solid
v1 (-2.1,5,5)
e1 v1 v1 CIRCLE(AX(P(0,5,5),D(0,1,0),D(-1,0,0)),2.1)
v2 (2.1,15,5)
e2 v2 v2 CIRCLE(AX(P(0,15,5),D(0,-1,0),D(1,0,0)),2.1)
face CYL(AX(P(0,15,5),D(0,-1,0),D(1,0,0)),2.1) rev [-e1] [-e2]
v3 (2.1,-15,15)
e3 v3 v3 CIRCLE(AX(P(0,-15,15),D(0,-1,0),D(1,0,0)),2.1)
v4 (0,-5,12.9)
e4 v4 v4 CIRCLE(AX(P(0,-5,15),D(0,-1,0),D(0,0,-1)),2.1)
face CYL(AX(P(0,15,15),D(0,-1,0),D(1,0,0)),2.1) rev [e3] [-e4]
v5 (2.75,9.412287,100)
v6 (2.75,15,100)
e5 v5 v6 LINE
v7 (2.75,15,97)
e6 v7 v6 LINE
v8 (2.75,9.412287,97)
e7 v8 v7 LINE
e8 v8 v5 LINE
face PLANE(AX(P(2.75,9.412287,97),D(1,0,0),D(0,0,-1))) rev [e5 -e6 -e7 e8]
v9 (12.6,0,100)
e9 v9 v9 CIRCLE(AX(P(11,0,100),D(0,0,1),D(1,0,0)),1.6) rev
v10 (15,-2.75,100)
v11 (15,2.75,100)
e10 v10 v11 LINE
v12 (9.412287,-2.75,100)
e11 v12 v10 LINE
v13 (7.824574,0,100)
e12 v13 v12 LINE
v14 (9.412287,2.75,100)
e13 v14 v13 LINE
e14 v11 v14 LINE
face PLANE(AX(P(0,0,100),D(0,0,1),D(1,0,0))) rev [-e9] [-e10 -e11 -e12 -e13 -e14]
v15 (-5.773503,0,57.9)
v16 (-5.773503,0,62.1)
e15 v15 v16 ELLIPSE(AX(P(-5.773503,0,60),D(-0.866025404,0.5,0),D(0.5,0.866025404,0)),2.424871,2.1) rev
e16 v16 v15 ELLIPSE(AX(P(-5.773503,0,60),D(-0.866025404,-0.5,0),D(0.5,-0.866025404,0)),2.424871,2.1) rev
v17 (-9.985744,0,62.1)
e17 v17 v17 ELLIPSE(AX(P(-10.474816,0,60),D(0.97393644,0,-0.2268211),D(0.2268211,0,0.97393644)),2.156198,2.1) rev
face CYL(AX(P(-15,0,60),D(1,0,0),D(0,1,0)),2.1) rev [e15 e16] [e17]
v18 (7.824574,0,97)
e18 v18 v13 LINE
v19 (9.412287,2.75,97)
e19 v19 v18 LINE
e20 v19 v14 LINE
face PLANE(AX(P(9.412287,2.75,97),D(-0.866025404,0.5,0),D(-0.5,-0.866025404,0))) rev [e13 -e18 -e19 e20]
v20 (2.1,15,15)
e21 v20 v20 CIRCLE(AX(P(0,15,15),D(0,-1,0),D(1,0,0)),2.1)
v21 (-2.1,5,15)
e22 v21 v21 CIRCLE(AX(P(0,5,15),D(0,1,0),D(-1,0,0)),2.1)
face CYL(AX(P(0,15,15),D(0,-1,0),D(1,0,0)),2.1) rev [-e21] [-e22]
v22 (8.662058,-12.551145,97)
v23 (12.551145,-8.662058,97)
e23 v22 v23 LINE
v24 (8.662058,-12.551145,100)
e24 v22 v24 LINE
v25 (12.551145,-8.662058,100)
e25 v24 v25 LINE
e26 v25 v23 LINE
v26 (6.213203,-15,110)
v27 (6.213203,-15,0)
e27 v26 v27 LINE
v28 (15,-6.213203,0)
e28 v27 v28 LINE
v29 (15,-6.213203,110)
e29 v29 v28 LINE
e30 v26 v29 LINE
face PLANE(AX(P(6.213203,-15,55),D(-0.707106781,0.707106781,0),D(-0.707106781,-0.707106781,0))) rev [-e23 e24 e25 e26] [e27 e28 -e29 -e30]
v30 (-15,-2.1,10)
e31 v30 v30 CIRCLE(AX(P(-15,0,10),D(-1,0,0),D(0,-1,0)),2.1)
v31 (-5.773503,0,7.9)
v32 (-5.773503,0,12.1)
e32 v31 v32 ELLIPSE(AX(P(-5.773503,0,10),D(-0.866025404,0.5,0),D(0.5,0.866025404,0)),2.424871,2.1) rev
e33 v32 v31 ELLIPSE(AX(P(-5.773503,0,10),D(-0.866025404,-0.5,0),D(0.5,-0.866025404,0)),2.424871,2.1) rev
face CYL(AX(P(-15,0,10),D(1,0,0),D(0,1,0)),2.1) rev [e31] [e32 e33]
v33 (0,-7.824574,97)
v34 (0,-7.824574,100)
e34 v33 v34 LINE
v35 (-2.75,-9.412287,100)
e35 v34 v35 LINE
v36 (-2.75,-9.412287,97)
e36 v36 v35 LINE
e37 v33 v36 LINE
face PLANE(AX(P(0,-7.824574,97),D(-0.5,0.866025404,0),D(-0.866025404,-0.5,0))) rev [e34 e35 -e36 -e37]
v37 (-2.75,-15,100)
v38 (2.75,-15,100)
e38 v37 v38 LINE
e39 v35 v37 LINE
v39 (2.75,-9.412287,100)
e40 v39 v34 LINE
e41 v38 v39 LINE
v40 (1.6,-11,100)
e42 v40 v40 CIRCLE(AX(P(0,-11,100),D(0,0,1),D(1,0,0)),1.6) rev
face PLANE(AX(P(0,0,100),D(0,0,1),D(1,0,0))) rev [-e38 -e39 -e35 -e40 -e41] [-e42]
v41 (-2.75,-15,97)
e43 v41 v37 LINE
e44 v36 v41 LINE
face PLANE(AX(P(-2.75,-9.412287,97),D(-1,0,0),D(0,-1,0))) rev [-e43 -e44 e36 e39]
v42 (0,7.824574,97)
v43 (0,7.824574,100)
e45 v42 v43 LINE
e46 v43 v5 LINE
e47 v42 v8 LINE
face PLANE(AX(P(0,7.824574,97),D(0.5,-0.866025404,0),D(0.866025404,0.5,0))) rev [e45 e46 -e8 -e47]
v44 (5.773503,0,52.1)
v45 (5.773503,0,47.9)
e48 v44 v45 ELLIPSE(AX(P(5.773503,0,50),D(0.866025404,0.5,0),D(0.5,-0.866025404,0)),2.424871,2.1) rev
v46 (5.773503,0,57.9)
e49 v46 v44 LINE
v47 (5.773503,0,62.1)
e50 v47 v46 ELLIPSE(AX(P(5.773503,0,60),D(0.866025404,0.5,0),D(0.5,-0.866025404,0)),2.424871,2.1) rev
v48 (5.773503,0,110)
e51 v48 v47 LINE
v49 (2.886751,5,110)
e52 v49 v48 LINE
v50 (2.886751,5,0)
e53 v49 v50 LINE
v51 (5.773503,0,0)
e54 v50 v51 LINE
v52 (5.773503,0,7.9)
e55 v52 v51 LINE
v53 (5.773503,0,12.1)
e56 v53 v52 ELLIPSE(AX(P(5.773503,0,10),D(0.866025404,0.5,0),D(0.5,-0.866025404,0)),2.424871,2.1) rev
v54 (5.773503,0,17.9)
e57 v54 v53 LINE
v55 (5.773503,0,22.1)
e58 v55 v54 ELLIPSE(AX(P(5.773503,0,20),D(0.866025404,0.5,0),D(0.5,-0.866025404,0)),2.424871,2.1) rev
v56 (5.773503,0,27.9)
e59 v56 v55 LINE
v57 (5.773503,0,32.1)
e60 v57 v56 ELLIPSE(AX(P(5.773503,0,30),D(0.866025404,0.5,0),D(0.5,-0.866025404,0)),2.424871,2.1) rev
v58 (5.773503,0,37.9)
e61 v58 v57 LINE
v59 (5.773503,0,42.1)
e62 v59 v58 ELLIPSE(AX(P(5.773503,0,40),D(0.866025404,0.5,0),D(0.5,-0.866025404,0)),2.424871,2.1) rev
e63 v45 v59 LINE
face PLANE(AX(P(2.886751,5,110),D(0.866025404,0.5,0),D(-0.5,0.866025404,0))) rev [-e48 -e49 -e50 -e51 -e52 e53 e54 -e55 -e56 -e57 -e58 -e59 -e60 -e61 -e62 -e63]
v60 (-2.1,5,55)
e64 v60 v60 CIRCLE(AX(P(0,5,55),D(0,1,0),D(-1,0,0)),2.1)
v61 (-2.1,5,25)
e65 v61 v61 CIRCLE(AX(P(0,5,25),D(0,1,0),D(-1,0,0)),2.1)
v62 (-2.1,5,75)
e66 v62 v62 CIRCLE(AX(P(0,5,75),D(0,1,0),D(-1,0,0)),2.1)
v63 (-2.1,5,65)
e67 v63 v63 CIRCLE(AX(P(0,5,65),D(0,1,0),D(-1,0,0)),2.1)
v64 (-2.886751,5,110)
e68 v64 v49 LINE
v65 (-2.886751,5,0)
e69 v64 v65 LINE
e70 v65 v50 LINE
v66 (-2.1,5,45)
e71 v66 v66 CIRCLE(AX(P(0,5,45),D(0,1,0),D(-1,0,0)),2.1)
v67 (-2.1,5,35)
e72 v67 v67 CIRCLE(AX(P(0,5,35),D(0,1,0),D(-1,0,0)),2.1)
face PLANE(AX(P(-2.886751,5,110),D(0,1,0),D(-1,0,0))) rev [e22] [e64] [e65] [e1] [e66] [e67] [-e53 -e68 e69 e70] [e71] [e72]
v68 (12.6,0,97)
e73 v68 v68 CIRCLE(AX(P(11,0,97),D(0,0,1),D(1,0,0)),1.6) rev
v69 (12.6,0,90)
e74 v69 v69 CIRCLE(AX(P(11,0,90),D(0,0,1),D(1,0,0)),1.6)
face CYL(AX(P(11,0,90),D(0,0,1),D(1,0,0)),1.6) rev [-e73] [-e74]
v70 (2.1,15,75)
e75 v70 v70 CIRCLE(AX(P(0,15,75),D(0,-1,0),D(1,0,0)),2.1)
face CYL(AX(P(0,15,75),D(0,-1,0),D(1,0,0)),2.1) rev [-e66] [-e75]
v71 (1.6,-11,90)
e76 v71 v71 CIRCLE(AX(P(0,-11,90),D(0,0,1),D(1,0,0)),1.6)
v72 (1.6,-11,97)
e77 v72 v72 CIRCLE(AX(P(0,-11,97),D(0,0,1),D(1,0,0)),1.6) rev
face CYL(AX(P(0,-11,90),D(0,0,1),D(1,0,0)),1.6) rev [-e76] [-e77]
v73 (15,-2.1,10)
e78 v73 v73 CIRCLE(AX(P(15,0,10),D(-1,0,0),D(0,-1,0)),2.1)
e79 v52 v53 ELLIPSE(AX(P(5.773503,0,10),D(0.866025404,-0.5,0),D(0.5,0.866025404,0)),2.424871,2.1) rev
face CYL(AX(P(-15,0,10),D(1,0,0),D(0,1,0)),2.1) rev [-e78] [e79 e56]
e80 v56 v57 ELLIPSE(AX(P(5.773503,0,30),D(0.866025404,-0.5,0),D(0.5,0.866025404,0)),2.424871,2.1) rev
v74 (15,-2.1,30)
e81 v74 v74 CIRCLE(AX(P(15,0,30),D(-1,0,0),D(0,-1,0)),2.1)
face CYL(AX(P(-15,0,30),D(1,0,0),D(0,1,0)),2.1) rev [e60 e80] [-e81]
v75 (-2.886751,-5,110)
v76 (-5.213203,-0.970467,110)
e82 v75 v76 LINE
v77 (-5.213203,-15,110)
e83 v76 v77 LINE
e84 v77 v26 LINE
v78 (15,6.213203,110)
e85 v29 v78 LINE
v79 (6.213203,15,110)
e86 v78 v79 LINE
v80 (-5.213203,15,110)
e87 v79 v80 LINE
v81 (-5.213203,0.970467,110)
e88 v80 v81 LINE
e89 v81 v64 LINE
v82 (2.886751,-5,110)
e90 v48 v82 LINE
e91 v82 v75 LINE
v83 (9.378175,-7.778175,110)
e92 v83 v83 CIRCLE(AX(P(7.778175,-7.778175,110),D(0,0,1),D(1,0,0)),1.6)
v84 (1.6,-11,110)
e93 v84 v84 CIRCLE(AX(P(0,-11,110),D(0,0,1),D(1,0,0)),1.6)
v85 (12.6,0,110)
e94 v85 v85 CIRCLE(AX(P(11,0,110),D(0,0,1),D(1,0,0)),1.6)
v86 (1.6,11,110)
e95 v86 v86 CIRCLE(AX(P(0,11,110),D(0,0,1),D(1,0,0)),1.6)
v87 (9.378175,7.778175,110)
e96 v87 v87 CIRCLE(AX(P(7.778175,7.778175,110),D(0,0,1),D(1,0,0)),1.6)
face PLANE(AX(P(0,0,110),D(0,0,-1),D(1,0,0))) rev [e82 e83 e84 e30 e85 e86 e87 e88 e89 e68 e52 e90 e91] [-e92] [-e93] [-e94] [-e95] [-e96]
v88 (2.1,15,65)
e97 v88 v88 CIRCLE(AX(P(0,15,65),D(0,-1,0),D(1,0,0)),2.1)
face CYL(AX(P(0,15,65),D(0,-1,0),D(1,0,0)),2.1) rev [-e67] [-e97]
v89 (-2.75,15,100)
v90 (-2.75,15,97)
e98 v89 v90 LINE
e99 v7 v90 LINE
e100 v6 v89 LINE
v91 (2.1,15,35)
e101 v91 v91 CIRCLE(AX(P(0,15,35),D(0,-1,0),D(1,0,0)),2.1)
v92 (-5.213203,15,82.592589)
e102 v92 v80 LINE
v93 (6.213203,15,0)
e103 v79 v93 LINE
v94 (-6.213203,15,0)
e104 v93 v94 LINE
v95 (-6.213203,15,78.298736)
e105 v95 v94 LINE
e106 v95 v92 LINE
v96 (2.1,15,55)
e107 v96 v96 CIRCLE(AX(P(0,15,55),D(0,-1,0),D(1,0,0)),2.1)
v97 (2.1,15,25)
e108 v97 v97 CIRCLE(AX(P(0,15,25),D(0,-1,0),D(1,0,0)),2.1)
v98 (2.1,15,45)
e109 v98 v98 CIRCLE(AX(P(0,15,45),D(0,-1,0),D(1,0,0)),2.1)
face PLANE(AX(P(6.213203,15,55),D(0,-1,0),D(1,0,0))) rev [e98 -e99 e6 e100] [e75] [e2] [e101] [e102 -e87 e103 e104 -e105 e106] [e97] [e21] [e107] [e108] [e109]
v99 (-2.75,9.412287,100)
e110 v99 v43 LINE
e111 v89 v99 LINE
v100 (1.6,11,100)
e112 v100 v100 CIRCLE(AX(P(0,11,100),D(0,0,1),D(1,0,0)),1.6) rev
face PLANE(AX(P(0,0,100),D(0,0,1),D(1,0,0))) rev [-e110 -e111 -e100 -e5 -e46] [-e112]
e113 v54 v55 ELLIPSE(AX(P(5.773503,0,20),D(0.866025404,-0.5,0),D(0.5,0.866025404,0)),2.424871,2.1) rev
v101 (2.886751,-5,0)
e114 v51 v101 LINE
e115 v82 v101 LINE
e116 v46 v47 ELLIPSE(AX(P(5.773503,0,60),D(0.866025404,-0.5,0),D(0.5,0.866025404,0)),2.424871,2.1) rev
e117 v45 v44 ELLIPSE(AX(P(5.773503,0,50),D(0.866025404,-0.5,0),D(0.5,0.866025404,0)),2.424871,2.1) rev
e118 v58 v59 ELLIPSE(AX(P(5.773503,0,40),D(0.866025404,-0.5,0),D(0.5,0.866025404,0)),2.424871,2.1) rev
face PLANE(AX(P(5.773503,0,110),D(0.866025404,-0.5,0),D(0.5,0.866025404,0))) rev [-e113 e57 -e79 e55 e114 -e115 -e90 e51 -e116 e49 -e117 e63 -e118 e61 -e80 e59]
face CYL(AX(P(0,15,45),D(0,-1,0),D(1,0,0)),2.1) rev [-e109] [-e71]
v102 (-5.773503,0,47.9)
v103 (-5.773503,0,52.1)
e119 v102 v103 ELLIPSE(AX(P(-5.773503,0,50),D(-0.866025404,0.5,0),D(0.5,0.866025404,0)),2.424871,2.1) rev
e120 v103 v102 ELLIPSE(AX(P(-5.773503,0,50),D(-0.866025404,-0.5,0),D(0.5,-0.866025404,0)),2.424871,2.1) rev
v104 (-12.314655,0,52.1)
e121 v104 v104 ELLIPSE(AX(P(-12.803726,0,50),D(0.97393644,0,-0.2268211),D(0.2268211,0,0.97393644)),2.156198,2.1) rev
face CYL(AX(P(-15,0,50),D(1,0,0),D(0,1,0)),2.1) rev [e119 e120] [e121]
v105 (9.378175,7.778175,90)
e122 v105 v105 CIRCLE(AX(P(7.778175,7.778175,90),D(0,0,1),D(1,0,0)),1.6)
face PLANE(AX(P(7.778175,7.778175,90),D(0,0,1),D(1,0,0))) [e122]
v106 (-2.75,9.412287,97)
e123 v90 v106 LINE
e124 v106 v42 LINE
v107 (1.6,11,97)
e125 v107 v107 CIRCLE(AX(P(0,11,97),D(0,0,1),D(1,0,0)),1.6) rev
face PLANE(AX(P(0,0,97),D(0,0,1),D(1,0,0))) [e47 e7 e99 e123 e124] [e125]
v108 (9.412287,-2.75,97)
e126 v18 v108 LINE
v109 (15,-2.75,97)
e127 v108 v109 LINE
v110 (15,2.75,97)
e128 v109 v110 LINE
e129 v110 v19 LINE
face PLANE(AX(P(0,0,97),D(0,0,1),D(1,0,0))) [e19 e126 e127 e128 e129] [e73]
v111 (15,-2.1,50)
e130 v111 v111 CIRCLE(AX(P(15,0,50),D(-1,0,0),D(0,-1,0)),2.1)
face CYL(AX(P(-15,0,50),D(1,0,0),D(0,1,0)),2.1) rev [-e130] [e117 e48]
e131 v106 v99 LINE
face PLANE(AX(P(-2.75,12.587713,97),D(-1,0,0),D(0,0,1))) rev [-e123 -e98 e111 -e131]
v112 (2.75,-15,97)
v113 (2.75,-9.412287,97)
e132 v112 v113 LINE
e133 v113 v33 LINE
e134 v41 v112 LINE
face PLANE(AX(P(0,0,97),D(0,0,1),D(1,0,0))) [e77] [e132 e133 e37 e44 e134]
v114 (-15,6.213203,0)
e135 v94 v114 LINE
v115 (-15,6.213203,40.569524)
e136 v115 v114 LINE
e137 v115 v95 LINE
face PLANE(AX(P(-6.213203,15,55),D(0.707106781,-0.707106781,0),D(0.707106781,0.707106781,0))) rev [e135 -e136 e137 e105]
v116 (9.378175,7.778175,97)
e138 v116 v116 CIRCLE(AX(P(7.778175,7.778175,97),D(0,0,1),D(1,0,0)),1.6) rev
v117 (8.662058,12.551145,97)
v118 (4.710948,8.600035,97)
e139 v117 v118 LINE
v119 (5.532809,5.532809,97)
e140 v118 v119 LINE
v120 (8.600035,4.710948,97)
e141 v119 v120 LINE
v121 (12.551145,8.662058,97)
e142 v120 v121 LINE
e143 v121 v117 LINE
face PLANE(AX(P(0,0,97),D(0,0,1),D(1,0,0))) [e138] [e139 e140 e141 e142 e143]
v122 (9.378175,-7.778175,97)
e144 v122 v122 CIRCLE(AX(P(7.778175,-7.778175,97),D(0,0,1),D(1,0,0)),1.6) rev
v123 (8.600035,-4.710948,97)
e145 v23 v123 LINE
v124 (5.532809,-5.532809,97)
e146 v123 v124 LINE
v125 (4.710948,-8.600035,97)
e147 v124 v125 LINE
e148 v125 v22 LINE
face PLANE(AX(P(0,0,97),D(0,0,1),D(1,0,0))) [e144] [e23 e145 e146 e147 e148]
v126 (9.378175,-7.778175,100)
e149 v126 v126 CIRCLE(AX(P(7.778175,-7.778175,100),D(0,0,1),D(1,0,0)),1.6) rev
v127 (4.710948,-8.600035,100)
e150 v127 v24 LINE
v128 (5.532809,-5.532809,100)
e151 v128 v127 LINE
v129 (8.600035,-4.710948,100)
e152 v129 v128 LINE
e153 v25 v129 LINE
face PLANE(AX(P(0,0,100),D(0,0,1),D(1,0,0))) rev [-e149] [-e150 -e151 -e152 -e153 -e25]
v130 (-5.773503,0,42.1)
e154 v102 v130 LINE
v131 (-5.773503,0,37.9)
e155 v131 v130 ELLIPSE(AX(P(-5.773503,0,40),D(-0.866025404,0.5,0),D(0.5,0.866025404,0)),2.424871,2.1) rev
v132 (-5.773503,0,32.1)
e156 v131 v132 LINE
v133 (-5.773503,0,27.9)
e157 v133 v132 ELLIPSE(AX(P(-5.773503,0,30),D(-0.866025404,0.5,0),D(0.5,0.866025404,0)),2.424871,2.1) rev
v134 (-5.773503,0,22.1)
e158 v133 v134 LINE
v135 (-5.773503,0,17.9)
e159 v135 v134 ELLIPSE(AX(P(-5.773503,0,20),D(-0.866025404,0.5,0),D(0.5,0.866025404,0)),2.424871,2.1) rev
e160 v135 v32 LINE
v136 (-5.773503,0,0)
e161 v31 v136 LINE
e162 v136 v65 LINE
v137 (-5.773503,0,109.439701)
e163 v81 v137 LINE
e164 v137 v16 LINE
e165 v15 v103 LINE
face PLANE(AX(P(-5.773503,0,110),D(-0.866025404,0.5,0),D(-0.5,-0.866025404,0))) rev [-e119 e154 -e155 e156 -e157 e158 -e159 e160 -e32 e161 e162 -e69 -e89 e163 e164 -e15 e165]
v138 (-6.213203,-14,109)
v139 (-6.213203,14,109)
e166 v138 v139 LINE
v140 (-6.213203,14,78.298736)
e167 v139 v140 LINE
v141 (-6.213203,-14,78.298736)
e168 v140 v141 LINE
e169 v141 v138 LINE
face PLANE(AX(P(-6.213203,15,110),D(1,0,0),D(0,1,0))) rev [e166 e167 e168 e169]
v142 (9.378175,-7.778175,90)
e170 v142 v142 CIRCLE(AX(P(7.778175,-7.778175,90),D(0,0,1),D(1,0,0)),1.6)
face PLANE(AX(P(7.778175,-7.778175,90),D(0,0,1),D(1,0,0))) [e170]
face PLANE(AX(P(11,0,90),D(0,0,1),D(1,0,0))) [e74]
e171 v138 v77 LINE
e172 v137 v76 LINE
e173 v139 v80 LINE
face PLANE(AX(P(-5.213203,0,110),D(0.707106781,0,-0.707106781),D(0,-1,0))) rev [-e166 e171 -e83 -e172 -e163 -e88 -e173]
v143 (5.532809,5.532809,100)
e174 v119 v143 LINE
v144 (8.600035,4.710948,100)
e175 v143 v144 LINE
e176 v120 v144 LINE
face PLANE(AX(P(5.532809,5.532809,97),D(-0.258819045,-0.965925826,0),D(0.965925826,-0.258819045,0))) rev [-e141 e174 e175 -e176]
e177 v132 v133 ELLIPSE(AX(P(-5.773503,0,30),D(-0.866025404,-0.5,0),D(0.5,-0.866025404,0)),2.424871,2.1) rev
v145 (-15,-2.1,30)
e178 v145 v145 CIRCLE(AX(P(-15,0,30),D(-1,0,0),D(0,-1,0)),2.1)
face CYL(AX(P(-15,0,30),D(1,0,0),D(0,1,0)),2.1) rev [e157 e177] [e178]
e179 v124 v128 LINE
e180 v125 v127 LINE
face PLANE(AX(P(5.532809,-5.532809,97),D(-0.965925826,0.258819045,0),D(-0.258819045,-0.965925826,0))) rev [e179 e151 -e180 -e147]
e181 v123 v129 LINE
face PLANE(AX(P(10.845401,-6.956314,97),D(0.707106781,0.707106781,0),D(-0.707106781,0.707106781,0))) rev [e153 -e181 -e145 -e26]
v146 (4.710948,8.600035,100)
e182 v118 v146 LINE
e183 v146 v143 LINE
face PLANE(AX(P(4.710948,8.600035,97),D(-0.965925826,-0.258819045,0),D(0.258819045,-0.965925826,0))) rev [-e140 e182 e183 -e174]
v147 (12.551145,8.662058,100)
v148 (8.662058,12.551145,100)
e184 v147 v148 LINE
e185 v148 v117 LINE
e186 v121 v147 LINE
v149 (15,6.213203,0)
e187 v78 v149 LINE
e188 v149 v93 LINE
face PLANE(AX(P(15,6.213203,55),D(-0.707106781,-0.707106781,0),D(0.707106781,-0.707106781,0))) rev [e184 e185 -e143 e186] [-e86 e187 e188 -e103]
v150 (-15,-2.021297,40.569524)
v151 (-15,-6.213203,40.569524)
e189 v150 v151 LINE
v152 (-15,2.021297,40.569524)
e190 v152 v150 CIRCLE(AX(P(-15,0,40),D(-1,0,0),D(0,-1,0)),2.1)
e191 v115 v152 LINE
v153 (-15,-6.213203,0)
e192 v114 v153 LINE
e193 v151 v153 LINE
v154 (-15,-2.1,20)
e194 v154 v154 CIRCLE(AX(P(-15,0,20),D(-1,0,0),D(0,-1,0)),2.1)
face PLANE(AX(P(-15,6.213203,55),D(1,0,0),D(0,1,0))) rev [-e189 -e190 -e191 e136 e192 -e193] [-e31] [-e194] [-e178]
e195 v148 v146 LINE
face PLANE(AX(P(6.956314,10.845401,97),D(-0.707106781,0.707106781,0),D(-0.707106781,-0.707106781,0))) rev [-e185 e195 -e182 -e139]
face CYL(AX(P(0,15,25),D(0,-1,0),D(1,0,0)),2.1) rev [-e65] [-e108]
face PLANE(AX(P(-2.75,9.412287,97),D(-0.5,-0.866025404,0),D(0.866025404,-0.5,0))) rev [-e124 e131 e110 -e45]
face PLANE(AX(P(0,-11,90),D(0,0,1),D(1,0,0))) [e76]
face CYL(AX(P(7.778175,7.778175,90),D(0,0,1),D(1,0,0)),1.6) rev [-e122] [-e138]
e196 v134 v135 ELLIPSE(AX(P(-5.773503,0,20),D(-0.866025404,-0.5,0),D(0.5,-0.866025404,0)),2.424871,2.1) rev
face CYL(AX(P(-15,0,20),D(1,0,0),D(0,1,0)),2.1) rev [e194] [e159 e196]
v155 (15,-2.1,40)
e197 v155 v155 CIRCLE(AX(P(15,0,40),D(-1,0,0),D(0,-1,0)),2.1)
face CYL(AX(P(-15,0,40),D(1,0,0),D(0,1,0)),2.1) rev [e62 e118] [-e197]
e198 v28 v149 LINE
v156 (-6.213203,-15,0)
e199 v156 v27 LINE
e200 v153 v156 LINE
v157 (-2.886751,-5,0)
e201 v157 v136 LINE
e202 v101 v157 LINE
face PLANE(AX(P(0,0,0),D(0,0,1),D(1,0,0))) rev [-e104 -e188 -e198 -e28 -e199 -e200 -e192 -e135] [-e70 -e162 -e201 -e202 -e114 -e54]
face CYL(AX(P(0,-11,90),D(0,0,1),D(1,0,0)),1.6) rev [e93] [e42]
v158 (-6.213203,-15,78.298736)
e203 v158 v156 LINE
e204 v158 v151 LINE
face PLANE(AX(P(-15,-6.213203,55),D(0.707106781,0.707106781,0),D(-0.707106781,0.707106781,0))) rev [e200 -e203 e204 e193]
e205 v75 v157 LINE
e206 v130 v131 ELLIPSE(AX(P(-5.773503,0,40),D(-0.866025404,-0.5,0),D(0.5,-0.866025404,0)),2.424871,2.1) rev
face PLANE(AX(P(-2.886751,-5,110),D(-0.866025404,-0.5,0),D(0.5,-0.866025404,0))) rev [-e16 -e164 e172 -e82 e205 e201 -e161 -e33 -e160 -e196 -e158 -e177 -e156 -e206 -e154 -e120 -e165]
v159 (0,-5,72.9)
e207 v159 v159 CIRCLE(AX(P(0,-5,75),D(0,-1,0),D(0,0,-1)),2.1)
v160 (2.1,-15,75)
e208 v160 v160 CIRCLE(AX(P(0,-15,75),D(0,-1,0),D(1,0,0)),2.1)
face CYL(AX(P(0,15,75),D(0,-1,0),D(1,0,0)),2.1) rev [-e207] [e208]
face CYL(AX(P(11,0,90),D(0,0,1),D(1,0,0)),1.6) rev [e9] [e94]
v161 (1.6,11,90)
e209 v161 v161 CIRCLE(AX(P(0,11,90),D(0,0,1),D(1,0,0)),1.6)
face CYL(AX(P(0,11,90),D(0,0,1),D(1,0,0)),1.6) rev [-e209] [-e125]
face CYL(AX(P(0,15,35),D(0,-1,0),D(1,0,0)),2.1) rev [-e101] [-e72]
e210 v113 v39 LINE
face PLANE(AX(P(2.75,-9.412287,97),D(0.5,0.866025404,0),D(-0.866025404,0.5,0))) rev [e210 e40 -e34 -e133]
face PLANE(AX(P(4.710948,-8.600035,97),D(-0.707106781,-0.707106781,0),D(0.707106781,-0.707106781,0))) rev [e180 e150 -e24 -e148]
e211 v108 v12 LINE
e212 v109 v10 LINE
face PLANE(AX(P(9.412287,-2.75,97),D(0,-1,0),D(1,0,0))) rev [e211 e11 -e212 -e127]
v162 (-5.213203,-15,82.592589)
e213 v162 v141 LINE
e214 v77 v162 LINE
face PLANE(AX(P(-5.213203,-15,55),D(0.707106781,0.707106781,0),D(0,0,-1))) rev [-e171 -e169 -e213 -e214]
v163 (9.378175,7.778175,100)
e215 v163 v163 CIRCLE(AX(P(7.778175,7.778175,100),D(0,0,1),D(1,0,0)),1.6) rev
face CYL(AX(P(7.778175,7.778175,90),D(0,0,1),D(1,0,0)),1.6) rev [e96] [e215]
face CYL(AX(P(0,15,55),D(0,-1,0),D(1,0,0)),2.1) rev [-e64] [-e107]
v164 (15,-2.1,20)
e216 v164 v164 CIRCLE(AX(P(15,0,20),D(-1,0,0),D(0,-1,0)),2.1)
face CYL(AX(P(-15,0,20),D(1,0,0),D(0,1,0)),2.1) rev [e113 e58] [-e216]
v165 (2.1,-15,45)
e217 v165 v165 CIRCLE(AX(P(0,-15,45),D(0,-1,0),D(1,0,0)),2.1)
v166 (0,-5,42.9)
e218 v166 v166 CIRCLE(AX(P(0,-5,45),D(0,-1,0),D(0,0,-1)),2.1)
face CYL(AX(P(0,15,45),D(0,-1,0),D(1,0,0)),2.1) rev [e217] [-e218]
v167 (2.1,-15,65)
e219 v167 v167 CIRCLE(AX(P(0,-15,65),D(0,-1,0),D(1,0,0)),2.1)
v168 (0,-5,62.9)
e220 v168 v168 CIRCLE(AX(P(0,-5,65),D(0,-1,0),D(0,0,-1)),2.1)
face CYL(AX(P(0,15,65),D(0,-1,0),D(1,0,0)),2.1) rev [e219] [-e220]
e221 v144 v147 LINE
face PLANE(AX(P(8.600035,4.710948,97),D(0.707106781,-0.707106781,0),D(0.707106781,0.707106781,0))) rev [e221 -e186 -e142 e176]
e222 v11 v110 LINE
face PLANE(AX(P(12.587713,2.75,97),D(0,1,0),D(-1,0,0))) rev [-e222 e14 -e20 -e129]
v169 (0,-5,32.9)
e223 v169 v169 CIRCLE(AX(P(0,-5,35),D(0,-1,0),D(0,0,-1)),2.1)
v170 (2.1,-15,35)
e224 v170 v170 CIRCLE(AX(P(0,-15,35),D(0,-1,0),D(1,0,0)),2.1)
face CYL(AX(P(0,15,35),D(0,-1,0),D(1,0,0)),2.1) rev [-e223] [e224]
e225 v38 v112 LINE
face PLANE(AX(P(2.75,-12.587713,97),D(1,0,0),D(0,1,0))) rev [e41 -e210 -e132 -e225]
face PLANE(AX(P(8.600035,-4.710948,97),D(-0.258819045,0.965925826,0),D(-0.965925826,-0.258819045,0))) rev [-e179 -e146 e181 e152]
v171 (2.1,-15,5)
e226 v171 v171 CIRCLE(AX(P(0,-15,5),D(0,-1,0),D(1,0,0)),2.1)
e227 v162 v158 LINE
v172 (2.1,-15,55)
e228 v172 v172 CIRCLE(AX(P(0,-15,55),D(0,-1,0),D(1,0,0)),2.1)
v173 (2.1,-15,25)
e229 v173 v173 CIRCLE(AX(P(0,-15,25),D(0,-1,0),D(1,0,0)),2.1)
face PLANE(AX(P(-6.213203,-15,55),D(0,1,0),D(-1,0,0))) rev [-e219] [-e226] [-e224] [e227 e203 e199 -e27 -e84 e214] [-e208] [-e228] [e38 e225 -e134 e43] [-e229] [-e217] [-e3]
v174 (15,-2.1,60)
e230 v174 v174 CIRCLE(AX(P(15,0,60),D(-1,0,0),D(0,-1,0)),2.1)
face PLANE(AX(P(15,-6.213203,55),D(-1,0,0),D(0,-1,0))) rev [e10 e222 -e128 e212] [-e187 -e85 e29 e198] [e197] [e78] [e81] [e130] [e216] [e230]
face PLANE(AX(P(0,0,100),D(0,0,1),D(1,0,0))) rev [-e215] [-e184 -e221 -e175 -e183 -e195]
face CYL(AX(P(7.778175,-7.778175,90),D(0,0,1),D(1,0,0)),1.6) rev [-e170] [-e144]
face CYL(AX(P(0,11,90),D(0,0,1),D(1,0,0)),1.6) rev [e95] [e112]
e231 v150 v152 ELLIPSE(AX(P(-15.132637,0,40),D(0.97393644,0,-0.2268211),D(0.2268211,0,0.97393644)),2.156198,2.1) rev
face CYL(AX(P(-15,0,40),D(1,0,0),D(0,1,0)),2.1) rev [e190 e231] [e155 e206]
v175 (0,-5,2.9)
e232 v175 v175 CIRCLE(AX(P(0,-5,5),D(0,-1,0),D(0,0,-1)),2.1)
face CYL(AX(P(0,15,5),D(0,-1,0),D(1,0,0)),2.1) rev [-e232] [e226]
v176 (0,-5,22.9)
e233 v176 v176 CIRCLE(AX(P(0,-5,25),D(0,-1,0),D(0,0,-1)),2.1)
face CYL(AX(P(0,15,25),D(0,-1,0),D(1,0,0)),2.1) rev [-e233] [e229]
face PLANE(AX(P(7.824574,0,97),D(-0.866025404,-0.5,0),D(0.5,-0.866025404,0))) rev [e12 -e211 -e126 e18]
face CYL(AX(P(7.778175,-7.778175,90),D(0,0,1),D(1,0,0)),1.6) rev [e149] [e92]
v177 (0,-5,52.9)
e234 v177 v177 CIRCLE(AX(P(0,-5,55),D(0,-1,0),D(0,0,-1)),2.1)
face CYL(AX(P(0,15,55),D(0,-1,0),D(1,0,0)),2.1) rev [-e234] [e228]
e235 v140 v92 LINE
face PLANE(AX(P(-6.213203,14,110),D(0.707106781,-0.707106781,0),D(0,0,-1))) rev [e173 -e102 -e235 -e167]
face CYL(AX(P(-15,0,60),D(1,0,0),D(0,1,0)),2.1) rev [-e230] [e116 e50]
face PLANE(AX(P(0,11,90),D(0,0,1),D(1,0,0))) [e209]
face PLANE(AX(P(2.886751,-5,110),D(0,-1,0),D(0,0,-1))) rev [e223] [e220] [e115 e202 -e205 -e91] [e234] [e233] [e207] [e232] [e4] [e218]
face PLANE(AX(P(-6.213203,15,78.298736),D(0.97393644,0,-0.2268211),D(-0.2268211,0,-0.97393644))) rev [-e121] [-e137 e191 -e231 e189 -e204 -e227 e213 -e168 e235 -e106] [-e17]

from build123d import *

# Parameters (mm, degrees)
SALIENTE_EXTRUIR1_DEPTH = 55
CORTAR_EXTRUIR3_DEPTH   = 113.026782512
CORTAR_EXTRUIR4_DEPTH   = 116
CROQUIS6_R              = 1.6
CORTAR_EXTRUIR5_DEPTH   = 20
CORTAR_EXTRUIR6_START   = -10
CORTAR_EXTRUIR6_DEPTH   = 3
CROQUIS8_R              = 2.1
CORTAR_EXTRUIR8_DEPTH   = 116
MATRIZL1_COUNT          = 8
MATRIZL1_PITCH          = 10
CHAFL_N1_SIZE           = 1
CROQUIS9_R              = 2.1
CORTAR_EXTRUIR11_DEPTH  = 130.421791055
MATRIZL2_COUNT          = 6
MATRIZL2_PITCH          = 10


with BuildPart() as part:
    # Croquis1 → Saliente-Extruir1 (new body)
    with BuildSketch(Plane.XY):
        Polygon((15, -6.213203436), (15, 6.213203436), (6.213203436, 15), (-6.213203436, 15), (-15, 6.213203436), (-15, -6.213203436), (-6.213203436, -15), (6.213203436, -15), align=None)
    saliente_extruir1 = extrude(amount=SALIENTE_EXTRUIR1_DEPTH)

    # Simetría1: Saliente-Extruir1 across plane
    add(saliente_extruir1.mirror(Plane.XY.offset(55)))

    # Croquis4 → Cortar-Extruir3 (cut, through all)
    with BuildSketch(Plane(origin=(0, 0, 0), x_dir=(-1, 0, 0), z_dir=(0, 0, -1))):
        Polygon((-5.773502692, 0), (-2.886751346, -5), (2.886751346, -5), (5.773502692, 0), (2.886751346, 5), (-2.886751346, 5), align=None)
    extrude(amount=-CORTAR_EXTRUIR3_DEPTH, mode=Mode.SUBTRACT)

    # Croquis5 → Cortar-Extruir4 (cut, through all)
    with BuildSketch(Plane.XZ.offset(15)):
        Polygon((-6.213203436, 110), (-6.213203436, 78.298736304), (-15, 40.569524353), (-15, 110), align=None)
    extrude(amount=-CORTAR_EXTRUIR4_DEPTH, mode=Mode.SUBTRACT)

    # Croquis6 → Cortar-Extruir5 (cut)
    with BuildSketch(Plane.XY.offset(110)):
        with Locations((0, 11)):
            Circle(CROQUIS6_R)
        with Locations((7.778174593, 7.778174593)):
            Circle(CROQUIS6_R)
        with Locations((11, 0)):
            Circle(CROQUIS6_R)
        with Locations((7.778174593, -7.778174593)):
            Circle(CROQUIS6_R)
        with Locations((0, -11)):
            Circle(CROQUIS6_R)
    extrude(amount=-CORTAR_EXTRUIR5_DEPTH, mode=Mode.SUBTRACT)

    # Croquis7 → Cortar-Extruir6 (cut)
    with BuildSketch(Plane.XY.offset(110).offset(CORTAR_EXTRUIR6_START)):
        Polygon((-2.75, 12.58771324), (-2.75, 18.463203436), (2.75, 23.963203436), (2.75, 12.58771324), (2.75, 9.41228676), (0, 7.824573519), (-2.75, 9.41228676), align=None)
        Polygon((6.956313744, 10.84540104), (11.110912703, 15), (18.889087297, 15), (10.84540104, 6.956313744), (8.600035443, 4.710948146), (5.532808996, 5.532808996), (4.710948146, 8.600035443), align=None)
        Polygon((12.58771324, 2.75), (18.463203436, 2.75), (23.963203436, -2.75), (12.58771324, -2.75), (9.41228676, -2.75), (7.824573519, 0), (9.41228676, 2.75), align=None)
        Polygon((10.84540104, -6.956313744), (15, -11.110912703), (15, -18.889087297), (6.956313744, -10.84540104), (4.710948146, -8.600035443), (5.532808996, -5.532808996), (8.600035443, -4.710948146), align=None)
        Polygon((2.75, -12.58771324), (2.75, -18.463203436), (-2.75, -23.963203436), (-2.75, -12.58771324), (-2.75, -9.41228676), (0, -7.824573519), (2.75, -9.41228676), align=None)
    extrude(amount=-CORTAR_EXTRUIR6_DEPTH, mode=Mode.SUBTRACT)

    # Croquis8 → Cortar-Extruir8 (cut, through all)
    with BuildSketch(Plane.XZ.offset(15)):
        with Locations((0, 5)):
            Circle(CROQUIS8_R)
    cortar_extruir8 = extrude(amount=-CORTAR_EXTRUIR8_DEPTH, mode=Mode.SUBTRACT)

    # MatrizL1: Cortar-Extruir8 ×8
    with Locations(*[(0, 0, i * MATRIZL1_PITCH) for i in range(1, MATRIZL1_COUNT)]):
        add(cortar_extruir8, mode=Mode.SUBTRACT)

    # Chaflán1
    # the kernel refuses this chamfer: 1 mm, written as the material it takes off along each edge
    with BuildSketch(Plane(origin=(-6.213203436, -15, 112.571682988), x_dir=(0.9996219169112968, -0.027495876610585623, 0), z_dir=(0, 0, -1))) as chafl_n1_piece_1_section:
        Polygon((CHAFL_N1_SIZE * 0.999621916911, -CHAFL_N1_SIZE * 0.0274958766106), (-CHAFL_N1_SIZE * 0.0274958766106, -CHAFL_N1_SIZE * 0.999621916911), (0, 0), align=None)
    chafl_n1_piece_1 = extrude(amount=34.272946684, mode=Mode.PRIVATE)
    chafl_n1_piece_1 = split(chafl_n1_piece_1, bisect_by=Plane(origin=(-2.540552648, -14.662726337, 94.068558556), z_dir=(-0.9739364396780411, 0, 0.22682110013678505)), keep=Keep.TOP, mode=Mode.PRIVATE)
    add(chafl_n1_piece_1, mode=Mode.SUBTRACT)
    with BuildSketch(Plane(origin=(-6.213203436, 15, 78.298736304), x_dir=(-0.027495876610583055, -0.9996219169112968, 0), z_dir=(0, 0, 1))) as chafl_n1_piece_2_section:
        Polygon((CHAFL_N1_SIZE * 0.999621916911, CHAFL_N1_SIZE * 0.0274958766106), (-CHAFL_N1_SIZE * 0.0274958766106, CHAFL_N1_SIZE * 0.999621916911), (0, 0), align=None)
    chafl_n1_piece_2 = extrude(amount=34.272946684, mode=Mode.PRIVATE)
    chafl_n1_piece_2 = split(chafl_n1_piece_2, bisect_by=Plane(origin=(-2.540552648, 14.662726337, 94.068558556), z_dir=(-0.9739364396780411, 0, 0.22682110013678505)), keep=Keep.TOP, mode=Mode.PRIVATE)
    add(chafl_n1_piece_2, mode=Mode.SUBTRACT)
    with BuildSketch(Plane(origin=(-6.213203436, -17.571682988, 110), x_dir=(0.999621916911297, 0, 0.027495876610582174), z_dir=(0, 1, 0))) as chafl_n1_piece_3:
        Polygon((CHAFL_N1_SIZE * 0.999621916911, CHAFL_N1_SIZE * 0.0274958766106), (-CHAFL_N1_SIZE * 0.0274958766106, CHAFL_N1_SIZE * 0.999621916911), (0, 0), align=None)
    extrude(amount=35.143365976, mode=Mode.SUBTRACT)

    # Croquis9 → Cortar-Extruir11 (cut, through all)
    with BuildSketch(Plane(origin=(15, 0, -15), x_dir=(0, 0, -1), z_dir=(-1, 0, 0))):
        with Locations((-25, 0)):
            Circle(CROQUIS9_R)
    cortar_extruir11 = extrude(amount=CORTAR_EXTRUIR11_DEPTH, mode=Mode.SUBTRACT)

    # MatrizL2: Cortar-Extruir11 ×6
    with Locations(*[(0, 0, i * MATRIZL2_PITCH) for i in range(1, MATRIZL2_COUNT)]):
        add(cortar_extruir11, mode=Mode.SUBTRACT)


solid = part.part
